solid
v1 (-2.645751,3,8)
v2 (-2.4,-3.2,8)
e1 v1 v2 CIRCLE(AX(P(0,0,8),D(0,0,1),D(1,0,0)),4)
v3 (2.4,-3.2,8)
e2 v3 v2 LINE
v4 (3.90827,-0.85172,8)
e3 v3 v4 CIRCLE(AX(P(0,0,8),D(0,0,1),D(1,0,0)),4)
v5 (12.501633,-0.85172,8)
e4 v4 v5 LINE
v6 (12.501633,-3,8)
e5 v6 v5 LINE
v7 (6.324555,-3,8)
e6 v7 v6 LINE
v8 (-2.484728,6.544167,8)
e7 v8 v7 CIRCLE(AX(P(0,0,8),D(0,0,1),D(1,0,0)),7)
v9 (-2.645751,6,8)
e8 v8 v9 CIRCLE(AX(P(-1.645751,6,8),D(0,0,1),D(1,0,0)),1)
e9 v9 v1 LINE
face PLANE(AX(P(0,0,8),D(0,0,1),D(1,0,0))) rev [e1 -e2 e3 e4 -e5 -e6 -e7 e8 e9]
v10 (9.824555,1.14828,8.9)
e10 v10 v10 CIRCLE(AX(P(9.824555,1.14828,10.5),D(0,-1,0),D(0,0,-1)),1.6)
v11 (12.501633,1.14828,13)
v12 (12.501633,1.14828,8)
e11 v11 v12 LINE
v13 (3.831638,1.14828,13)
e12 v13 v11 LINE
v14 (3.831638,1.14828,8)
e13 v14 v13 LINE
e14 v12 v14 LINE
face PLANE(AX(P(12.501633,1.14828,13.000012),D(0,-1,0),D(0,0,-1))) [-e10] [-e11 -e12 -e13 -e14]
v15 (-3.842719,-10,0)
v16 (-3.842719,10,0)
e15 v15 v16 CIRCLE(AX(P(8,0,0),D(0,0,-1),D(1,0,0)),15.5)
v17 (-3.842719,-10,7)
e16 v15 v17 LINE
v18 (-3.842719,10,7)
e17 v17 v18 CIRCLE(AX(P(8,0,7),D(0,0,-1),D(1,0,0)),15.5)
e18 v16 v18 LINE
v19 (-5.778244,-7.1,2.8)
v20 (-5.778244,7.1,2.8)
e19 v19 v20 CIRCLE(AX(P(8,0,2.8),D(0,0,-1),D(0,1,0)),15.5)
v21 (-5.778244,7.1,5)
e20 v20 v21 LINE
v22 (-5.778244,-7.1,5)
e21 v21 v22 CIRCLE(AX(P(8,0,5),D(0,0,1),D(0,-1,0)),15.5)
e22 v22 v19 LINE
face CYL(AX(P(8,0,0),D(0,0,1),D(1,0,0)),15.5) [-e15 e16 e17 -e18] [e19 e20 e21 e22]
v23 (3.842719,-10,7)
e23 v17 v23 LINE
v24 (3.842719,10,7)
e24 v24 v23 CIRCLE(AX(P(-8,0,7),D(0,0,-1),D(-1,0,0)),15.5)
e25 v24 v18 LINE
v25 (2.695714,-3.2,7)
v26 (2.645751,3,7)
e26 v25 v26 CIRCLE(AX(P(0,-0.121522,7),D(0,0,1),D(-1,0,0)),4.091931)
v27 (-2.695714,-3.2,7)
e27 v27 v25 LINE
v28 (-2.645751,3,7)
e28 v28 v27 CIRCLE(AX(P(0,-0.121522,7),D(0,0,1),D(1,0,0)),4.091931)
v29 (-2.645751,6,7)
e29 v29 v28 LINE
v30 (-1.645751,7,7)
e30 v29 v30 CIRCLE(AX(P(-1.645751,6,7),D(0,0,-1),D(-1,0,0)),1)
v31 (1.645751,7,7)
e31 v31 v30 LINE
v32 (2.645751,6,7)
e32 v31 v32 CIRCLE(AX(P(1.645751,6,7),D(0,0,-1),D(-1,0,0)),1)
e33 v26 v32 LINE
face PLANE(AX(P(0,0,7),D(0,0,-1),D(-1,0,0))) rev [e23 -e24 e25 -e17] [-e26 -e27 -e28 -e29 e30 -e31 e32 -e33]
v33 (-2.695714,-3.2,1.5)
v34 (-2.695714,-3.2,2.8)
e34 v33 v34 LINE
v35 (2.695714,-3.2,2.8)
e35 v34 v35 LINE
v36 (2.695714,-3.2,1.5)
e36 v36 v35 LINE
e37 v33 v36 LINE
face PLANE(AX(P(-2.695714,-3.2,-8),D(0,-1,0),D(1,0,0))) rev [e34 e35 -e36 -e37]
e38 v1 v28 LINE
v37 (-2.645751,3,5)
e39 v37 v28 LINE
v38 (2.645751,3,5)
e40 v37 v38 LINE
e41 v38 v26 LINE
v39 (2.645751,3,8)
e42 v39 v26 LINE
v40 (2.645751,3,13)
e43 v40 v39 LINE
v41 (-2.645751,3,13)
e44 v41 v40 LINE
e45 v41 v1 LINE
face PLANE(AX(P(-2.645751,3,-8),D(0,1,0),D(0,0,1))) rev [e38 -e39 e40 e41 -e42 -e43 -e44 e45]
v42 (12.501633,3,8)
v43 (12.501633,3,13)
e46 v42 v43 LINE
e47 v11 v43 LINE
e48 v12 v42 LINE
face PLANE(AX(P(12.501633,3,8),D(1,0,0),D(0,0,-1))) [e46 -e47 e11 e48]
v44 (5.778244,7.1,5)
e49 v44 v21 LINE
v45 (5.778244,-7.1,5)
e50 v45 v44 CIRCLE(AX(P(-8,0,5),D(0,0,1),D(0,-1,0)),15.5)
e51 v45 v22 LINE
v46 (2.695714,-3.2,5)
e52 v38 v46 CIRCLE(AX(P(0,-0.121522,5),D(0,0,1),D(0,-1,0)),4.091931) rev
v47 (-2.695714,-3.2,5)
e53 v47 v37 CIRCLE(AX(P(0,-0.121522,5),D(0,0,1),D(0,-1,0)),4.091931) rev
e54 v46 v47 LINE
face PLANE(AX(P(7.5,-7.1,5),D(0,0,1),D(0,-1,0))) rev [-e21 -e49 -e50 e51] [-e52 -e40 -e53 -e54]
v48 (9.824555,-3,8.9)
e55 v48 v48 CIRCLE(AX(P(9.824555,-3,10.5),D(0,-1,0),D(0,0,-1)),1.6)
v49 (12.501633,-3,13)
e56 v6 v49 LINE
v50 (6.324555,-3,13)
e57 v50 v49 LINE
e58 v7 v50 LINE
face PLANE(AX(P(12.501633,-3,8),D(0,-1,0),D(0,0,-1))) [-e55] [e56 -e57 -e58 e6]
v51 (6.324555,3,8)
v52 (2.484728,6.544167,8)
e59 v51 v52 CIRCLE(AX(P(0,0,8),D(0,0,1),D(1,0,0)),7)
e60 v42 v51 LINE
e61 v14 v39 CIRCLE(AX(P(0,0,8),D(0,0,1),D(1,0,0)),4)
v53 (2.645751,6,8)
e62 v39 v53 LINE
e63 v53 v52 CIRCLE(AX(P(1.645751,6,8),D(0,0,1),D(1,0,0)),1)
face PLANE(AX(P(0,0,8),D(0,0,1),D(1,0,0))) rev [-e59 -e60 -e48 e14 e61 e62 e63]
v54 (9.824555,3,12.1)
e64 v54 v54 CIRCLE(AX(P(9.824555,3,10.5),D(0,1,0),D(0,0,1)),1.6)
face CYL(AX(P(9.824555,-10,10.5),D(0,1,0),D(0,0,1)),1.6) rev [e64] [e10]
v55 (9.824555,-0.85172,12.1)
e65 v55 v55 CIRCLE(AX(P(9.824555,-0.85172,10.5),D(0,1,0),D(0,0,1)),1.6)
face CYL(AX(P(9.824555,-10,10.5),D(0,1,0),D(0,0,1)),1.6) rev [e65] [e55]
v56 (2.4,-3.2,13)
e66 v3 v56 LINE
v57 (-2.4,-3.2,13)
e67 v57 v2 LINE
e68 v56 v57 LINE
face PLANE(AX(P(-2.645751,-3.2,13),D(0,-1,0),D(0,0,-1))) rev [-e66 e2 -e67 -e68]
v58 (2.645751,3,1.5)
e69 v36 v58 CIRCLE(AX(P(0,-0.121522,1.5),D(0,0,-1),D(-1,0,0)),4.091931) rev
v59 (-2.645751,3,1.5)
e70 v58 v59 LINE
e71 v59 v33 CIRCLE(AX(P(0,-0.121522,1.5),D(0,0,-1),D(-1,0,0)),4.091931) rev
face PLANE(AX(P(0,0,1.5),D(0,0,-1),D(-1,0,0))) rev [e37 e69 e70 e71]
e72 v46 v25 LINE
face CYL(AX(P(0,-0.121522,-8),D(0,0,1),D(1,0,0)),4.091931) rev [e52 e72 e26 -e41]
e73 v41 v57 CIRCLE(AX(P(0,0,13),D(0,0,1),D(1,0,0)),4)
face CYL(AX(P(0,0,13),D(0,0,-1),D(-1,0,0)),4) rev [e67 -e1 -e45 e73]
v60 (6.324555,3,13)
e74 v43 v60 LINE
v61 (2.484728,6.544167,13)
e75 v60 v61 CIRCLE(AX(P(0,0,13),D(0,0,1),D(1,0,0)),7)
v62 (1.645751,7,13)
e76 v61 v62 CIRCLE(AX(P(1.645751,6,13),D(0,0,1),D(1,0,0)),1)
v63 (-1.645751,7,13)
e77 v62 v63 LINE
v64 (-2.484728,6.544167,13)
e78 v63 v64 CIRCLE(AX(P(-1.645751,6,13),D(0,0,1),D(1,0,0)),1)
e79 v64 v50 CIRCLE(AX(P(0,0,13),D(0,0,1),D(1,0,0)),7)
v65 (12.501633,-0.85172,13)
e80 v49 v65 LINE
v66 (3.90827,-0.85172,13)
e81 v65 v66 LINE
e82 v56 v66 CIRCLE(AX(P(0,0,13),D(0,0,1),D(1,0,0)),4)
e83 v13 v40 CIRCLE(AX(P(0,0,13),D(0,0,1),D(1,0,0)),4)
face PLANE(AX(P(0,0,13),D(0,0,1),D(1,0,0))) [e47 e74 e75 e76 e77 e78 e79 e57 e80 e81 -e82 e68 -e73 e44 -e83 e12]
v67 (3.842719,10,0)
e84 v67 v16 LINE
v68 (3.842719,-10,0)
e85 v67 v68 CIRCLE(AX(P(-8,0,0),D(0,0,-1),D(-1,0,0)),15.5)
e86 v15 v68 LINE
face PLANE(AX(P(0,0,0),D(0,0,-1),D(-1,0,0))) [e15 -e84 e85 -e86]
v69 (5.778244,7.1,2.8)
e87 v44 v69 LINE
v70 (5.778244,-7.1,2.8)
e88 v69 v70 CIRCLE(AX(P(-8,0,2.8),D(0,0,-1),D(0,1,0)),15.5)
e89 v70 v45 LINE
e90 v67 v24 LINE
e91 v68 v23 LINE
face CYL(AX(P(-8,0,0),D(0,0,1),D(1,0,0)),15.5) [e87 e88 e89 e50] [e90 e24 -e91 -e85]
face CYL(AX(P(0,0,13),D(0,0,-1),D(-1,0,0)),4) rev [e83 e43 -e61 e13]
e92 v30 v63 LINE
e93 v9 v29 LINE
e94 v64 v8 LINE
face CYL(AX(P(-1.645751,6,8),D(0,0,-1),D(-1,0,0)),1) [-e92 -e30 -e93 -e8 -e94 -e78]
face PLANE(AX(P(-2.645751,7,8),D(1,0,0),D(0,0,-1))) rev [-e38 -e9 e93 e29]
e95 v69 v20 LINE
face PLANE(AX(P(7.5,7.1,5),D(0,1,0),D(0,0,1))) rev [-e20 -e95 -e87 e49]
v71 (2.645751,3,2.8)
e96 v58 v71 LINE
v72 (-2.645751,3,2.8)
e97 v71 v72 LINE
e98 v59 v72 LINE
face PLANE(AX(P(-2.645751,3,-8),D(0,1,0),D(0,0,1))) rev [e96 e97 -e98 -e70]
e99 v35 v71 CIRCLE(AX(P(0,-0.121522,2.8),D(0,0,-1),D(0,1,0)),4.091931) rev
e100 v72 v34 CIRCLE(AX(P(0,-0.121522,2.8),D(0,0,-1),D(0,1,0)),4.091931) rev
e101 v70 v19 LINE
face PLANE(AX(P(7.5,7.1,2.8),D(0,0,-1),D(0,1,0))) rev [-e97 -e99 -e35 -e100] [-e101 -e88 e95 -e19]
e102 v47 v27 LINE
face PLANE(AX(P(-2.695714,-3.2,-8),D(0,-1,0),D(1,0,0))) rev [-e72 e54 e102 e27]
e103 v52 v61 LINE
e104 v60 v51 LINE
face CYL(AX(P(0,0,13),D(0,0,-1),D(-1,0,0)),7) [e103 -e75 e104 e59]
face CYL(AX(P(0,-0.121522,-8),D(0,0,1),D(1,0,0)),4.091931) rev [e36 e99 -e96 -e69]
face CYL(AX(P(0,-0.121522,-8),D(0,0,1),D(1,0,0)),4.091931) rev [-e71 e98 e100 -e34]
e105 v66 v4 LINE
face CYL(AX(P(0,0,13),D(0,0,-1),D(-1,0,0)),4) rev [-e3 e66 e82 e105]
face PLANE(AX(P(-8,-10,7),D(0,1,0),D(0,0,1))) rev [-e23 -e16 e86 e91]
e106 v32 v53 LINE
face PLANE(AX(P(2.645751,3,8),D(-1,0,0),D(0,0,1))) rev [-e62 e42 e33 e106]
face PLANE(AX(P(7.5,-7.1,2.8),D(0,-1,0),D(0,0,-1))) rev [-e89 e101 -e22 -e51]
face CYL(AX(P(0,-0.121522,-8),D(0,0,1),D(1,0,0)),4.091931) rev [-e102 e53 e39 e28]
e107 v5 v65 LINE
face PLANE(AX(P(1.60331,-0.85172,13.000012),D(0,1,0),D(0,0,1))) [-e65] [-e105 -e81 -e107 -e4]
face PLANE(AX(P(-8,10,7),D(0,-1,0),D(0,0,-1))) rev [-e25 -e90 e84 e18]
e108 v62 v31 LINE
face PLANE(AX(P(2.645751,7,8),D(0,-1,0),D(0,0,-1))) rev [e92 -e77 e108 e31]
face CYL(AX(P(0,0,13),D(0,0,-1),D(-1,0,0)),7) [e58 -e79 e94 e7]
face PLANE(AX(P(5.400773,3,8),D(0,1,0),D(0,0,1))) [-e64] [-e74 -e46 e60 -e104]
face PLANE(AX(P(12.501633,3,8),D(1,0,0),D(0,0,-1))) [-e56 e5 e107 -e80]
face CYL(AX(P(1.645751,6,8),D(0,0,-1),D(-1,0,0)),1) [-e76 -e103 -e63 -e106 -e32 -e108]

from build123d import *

# Parameters (mm, degrees)
SKETCH_1_W               = 16
SKETCH_1_H               = 20
EXTRUDE_1_DEPTH          = 7
CUT_EXTRUDE_1_DEPTH      = 15
CUT_EXTRUDE_3_DEPTH      = 15.594519519
SKETCH_6_W               = 5.291502622
SKETCH_6_H               = 4
EXTRUDE_2_DEPTH          = 1
CUT_EXTRUDE_5_DEPTH      = 17.338184405
CUT_EXTRUDE_5_DEPTH_BACK = 17.338184405
SKETCH_7_W               = 2.2
SKETCH_7_H               = 14.2
SKETCH_8_R               = 4.915012662
EXTRUDE_3_DEPTH          = 1.5
SKETCH_9_R               = 7
SKETCH_9_R_2             = 4
EXTRUDE_4_DEPTH          = 5
SKETCH_10_W              = 5.291502622
SKETCH_10_H              = 4
SKETCH_10_W_2            = 5.341465502
SKETCH_10_H_2            = 1.894443453
EXTRUDE_5_DEPTH          = 5
FILLET_1_R               = 1
EXTRUDE_6_DEPTH          = 5
CUT_EXTRUDE_6_DEPTH      = 21.622580814
CUT_EXTRUDE_6_DEPTH_BACK = 5
SKETCH_12_W              = 10.898323227
SKETCH_12_H              = 2
SKETCH_13_R              = 1.6
CUT_EXTRUDE_7_DEPTH      = 23.232652551


with BuildPart() as part:
    # 草图1 → 凸台-拉伸1 (new body)
    with BuildSketch(Plane.XY):
        Rectangle(SKETCH_1_W, SKETCH_1_H)
    extrude(amount=EXTRUDE_1_DEPTH)

    # 草图2 → 切除-拉伸1 (cut)
    with BuildSketch(Plane.XY.offset(7)):
        with BuildLine():
            Line((-2.645751311, 3), (2.645751311, 3))
            ThreePointArc((2.645751311, 3), (4.091798312, -0.088548302), (2.695714191, -3.2))
            Line((2.695714191, -3.2), (-2.695714191, -3.2))
            ThreePointArc((-2.695714191, -3.2), (-4.091798312, -0.088548302), (-2.645751311, 3))
        make_face()
    extrude(amount=-CUT_EXTRUDE_1_DEPTH, mode=Mode.SUBTRACT)

    # 草图4 → 切除-拉伸3 (cut, through all)
    with BuildSketch(Plane.XY.offset(7)):
        with BuildLine():
            Line((-3.842719282, 10), (-8, 10))
            Line((-8, 10), (-8, -10))
            Line((-8, -10), (-3.842719282, -10))
            ThreePointArc((-3.842719282, -10), (-7.5, 0), (-3.842719282, 10))
        make_face()
        with BuildLine():
            Line((3.842719282, 10), (8, 10))
            Line((8, 10), (8, -10))
            Line((8, -10), (3.842719282, -10))
            ThreePointArc((3.842719282, -10), (7.5, 0), (3.842719282, 10))
        make_face()
    extrude(amount=-CUT_EXTRUDE_3_DEPTH, mode=Mode.SUBTRACT)

    # 草图6 → 凸台-拉伸2 (add)
    with BuildSketch(Plane.XY.offset(7)):
        with Locations((0, 5)):
            Rectangle(SKETCH_6_W, SKETCH_6_H)
    extrude(amount=EXTRUDE_2_DEPTH)

    # 草图7 → 切除-拉伸5 (cut, two sides: drawn at the far end of the back side and taken through both)
    with BuildSketch(Plane.ZY.offset(2.645751311).offset(-CUT_EXTRUDE_5_DEPTH_BACK)):
        with Locations((3.9, 0)):
            Rectangle(SKETCH_7_W, SKETCH_7_H)
    extrude(amount=CUT_EXTRUDE_5_DEPTH + CUT_EXTRUDE_5_DEPTH_BACK, mode=Mode.SUBTRACT)

    # 草图8 → 凸台-拉伸3 (add)
    with BuildSketch(Plane(origin=(0, 0, 0), x_dir=(-1, 0, 0), z_dir=(0, 0, -1))):
        Circle(SKETCH_8_R)
    extrude(amount=-EXTRUDE_3_DEPTH)

    # 草图9 → 凸台-拉伸4 (add)
    with BuildSketch(Plane.XY.offset(8)):
        with Locations(Location((0, 0, 0), (0, 0, 112.207654299))):
            Circle(SKETCH_9_R)
        with Locations(Location((0, 0, 0), (0, 0, 131.409622109))):
            Circle(SKETCH_9_R_2, mode=Mode.SUBTRACT)
    extrude(amount=EXTRUDE_4_DEPTH)

    # 草图10 → 凸台-拉伸5 (add)
    with BuildSketch(Plane.XY.offset(8)):
        with Locations((0, 5)):
            Rectangle(SKETCH_10_W, SKETCH_10_H)
        with Locations((0.02498144, -4.147221726)):
            Rectangle(SKETCH_10_W_2, SKETCH_10_H_2)
    extrude(amount=EXTRUDE_5_DEPTH)

    # 圆角1
    # the kernel refuses this fillet: 1 mm, written as the material it takes off along each edge
    with BuildSketch(Plane(origin=(2.645751311, 7, 7), x_dir=(-1, 0, 0), z_dir=(0, 0, 1))) as fillet_1_piece_1_section:
        with BuildLine():
            CenterArc((FILLET_1_R, FILLET_1_R), FILLET_1_R, 180, 90)
            Line((0, FILLET_1_R), (0, 0))
            Line((0, 0), (FILLET_1_R, 0))
        make_face()
    fillet_1_piece_1 = extrude(amount=8.5, mode=Mode.PRIVATE)
    fillet_1_piece_1 = split(fillet_1_piece_1, bisect_by=Plane(origin=(2.390465062, 6.836939251, 8), z_dir=(0, 0, -1)), keep=Keep.TOP, mode=Mode.PRIVATE)
    fillet_1_piece_1 = fillet_1_piece_1 - Plane(origin=(0, 0, 7.5), x_dir=(-0.3779644730157475, 0.9258200997698897, 0), z_dir=(0, 0, -1)) * Cylinder(7, 21, mode=Mode.PRIVATE)
    add(fillet_1_piece_1, mode=Mode.SUBTRACT)
    with BuildSketch(Plane(origin=(2.645751311, 7, 7), x_dir=(-1, 0, 0), z_dir=(0, 0, 1))) as fillet_1_piece_2_section:
        with BuildLine():
            CenterArc((FILLET_1_R, FILLET_1_R), FILLET_1_R, 180, 90)
            Line((0, FILLET_1_R), (0, 0))
            Line((0, 0), (FILLET_1_R, 0))
        make_face()
    fillet_1_piece_2 = extrude(amount=8.5, mode=Mode.PRIVATE)
    fillet_1_piece_2 = split(fillet_1_piece_2, bisect_by=Plane(origin=(2.615865348, 6.342822841, 8), z_dir=(0, 0, -1)), keep=Keep.TOP, mode=Mode.PRIVATE)
    fillet_1_piece_2 = fillet_1_piece_2 & Plane(origin=(0, 0, 7.5), x_dir=(-0.3779644730157475, 0.9258200997698897, 0), z_dir=(0, 0, -1)) * Cylinder(7, 21, mode=Mode.PRIVATE)
    add(fillet_1_piece_2, mode=Mode.SUBTRACT)
    with BuildSketch(Plane(origin=(2.645751311, 7, 7), x_dir=(-1, 0, 0), z_dir=(0, 0, 1))) as fillet_1_piece_3_section:
        with BuildLine():
            CenterArc((FILLET_1_R, FILLET_1_R), FILLET_1_R, 180, 90)
            Line((0, FILLET_1_R), (0, 0))
            Line((0, 0), (FILLET_1_R, 0))
        make_face()
    fillet_1_piece_3 = extrude(amount=8.5, mode=Mode.PRIVATE)
    fillet_1_piece_3 = split(fillet_1_piece_3, bisect_by=Plane(origin=(2.390465062, 6.836939251, 8), z_dir=(0, 0, 1)), keep=Keep.TOP, mode=Mode.PRIVATE)
    fillet_1_piece_3 = fillet_1_piece_3 - Plane(origin=(0, 0, 11.75), x_dir=(-0.3779644730157475, 0.9258200997698897, 0), z_dir=(0, 0, -1)) * Cylinder(7, 21, mode=Mode.PRIVATE)
    add(fillet_1_piece_3, mode=Mode.SUBTRACT)
    with BuildSketch(Plane(origin=(-2.645751311, 7, 7), x_dir=(0, -1, 0), z_dir=(0, 0, 1))) as fillet_1_piece_4_section:
        with BuildLine():
            CenterArc((FILLET_1_R, FILLET_1_R), FILLET_1_R, 180, 90)
            Line((0, FILLET_1_R), (0, 0))
            Line((0, 0), (FILLET_1_R, 0))
        make_face()
    fillet_1_piece_4 = extrude(amount=8.5, mode=Mode.PRIVATE)
    fillet_1_piece_4 = fillet_1_piece_4 & Plane(origin=(0, 0, 7.5), x_dir=(-0.3779644730157475, 0.9258200997698897, 0), z_dir=(0, 0, -1)) * Cylinder(7, 21, mode=Mode.PRIVATE)
    fillet_1_piece_4 = split(fillet_1_piece_4, bisect_by=Plane(origin=(-2.615865348, 6.342822841, 8), z_dir=(0, 0, -1)), keep=Keep.TOP, mode=Mode.PRIVATE)
    add(fillet_1_piece_4, mode=Mode.SUBTRACT)
    with BuildSketch(Plane(origin=(-2.645751311, 7, 7), x_dir=(0, -1, 0), z_dir=(0, 0, 1))) as fillet_1_piece_5_section:
        with BuildLine():
            CenterArc((FILLET_1_R, FILLET_1_R), FILLET_1_R, 180, 90)
            Line((0, FILLET_1_R), (0, 0))
            Line((0, 0), (FILLET_1_R, 0))
        make_face()
    fillet_1_piece_5 = extrude(amount=8.5, mode=Mode.PRIVATE)
    fillet_1_piece_5 = fillet_1_piece_5 - Plane(origin=(0, 0, 7.5), x_dir=(-0.3779644730157475, 0.9258200997698897, 0), z_dir=(0, 0, -1)) * Cylinder(7, 21, mode=Mode.PRIVATE)
    fillet_1_piece_5 = split(fillet_1_piece_5, bisect_by=Plane(origin=(-2.390465062, 6.836939251, 8), z_dir=(0, 0, -1)), keep=Keep.TOP, mode=Mode.PRIVATE)
    add(fillet_1_piece_5, mode=Mode.SUBTRACT)
    with BuildSketch(Plane(origin=(-2.645751311, 7, 7), x_dir=(0, -1, 0), z_dir=(0, 0, 1))) as fillet_1_piece_6_section:
        with BuildLine():
            CenterArc((FILLET_1_R, FILLET_1_R), FILLET_1_R, 180, 90)
            Line((0, FILLET_1_R), (0, 0))
            Line((0, 0), (FILLET_1_R, 0))
        make_face()
    fillet_1_piece_6 = extrude(amount=8.5, mode=Mode.PRIVATE)
    fillet_1_piece_6 = fillet_1_piece_6 - Plane(origin=(0, 0, 11.75), x_dir=(-0.3779644730157475, 0.9258200997698897, 0), z_dir=(0, 0, -1)) * Cylinder(7, 21, mode=Mode.PRIVATE)
    fillet_1_piece_6 = split(fillet_1_piece_6, bisect_by=Plane(origin=(-2.390465062, 6.836939251, 8), z_dir=(0, 0, 1)), keep=Keep.TOP, mode=Mode.PRIVATE)
    add(fillet_1_piece_6, mode=Mode.SUBTRACT)

    # 草图11 → 凸台-拉伸6 (add)
    with BuildSketch(Plane.XY.offset(13)):
        Polygon((12.501633471, 1), (12.501633471, -1), (12.501633471, -3), (5.400773292, -3), (5.400773292, -1), (5.400773292, 1), (5.400773292, 3), (12.501633471, 3), align=None)
    extrude(amount=-EXTRUDE_6_DEPTH)

    # 草图12 → 切除-拉伸6 (cut, two sides: drawn at the far end of the back side and taken through both)
    with BuildSketch(Plane.XY.offset(13).offset(-CUT_EXTRUDE_6_DEPTH_BACK)):
        with Locations((7.052471858, 0.148280364)):
            Rectangle(SKETCH_12_W, SKETCH_12_H)
    extrude(amount=CUT_EXTRUDE_6_DEPTH + CUT_EXTRUDE_6_DEPTH_BACK, mode=Mode.SUBTRACT)

    # 草图13 → 切除-拉伸7 (cut, through all)
    with BuildSketch(Plane(origin=(0, 3, 0), x_dir=(1, 0, 0), z_dir=(0, 1, 0))):
        with Locations(Location((9.82455532, -10.5, 0), (0, 0, 270))):
            Circle(SKETCH_13_R)
    extrude(amount=-CUT_EXTRUDE_7_DEPTH, mode=Mode.SUBTRACT)


solid = part.part
